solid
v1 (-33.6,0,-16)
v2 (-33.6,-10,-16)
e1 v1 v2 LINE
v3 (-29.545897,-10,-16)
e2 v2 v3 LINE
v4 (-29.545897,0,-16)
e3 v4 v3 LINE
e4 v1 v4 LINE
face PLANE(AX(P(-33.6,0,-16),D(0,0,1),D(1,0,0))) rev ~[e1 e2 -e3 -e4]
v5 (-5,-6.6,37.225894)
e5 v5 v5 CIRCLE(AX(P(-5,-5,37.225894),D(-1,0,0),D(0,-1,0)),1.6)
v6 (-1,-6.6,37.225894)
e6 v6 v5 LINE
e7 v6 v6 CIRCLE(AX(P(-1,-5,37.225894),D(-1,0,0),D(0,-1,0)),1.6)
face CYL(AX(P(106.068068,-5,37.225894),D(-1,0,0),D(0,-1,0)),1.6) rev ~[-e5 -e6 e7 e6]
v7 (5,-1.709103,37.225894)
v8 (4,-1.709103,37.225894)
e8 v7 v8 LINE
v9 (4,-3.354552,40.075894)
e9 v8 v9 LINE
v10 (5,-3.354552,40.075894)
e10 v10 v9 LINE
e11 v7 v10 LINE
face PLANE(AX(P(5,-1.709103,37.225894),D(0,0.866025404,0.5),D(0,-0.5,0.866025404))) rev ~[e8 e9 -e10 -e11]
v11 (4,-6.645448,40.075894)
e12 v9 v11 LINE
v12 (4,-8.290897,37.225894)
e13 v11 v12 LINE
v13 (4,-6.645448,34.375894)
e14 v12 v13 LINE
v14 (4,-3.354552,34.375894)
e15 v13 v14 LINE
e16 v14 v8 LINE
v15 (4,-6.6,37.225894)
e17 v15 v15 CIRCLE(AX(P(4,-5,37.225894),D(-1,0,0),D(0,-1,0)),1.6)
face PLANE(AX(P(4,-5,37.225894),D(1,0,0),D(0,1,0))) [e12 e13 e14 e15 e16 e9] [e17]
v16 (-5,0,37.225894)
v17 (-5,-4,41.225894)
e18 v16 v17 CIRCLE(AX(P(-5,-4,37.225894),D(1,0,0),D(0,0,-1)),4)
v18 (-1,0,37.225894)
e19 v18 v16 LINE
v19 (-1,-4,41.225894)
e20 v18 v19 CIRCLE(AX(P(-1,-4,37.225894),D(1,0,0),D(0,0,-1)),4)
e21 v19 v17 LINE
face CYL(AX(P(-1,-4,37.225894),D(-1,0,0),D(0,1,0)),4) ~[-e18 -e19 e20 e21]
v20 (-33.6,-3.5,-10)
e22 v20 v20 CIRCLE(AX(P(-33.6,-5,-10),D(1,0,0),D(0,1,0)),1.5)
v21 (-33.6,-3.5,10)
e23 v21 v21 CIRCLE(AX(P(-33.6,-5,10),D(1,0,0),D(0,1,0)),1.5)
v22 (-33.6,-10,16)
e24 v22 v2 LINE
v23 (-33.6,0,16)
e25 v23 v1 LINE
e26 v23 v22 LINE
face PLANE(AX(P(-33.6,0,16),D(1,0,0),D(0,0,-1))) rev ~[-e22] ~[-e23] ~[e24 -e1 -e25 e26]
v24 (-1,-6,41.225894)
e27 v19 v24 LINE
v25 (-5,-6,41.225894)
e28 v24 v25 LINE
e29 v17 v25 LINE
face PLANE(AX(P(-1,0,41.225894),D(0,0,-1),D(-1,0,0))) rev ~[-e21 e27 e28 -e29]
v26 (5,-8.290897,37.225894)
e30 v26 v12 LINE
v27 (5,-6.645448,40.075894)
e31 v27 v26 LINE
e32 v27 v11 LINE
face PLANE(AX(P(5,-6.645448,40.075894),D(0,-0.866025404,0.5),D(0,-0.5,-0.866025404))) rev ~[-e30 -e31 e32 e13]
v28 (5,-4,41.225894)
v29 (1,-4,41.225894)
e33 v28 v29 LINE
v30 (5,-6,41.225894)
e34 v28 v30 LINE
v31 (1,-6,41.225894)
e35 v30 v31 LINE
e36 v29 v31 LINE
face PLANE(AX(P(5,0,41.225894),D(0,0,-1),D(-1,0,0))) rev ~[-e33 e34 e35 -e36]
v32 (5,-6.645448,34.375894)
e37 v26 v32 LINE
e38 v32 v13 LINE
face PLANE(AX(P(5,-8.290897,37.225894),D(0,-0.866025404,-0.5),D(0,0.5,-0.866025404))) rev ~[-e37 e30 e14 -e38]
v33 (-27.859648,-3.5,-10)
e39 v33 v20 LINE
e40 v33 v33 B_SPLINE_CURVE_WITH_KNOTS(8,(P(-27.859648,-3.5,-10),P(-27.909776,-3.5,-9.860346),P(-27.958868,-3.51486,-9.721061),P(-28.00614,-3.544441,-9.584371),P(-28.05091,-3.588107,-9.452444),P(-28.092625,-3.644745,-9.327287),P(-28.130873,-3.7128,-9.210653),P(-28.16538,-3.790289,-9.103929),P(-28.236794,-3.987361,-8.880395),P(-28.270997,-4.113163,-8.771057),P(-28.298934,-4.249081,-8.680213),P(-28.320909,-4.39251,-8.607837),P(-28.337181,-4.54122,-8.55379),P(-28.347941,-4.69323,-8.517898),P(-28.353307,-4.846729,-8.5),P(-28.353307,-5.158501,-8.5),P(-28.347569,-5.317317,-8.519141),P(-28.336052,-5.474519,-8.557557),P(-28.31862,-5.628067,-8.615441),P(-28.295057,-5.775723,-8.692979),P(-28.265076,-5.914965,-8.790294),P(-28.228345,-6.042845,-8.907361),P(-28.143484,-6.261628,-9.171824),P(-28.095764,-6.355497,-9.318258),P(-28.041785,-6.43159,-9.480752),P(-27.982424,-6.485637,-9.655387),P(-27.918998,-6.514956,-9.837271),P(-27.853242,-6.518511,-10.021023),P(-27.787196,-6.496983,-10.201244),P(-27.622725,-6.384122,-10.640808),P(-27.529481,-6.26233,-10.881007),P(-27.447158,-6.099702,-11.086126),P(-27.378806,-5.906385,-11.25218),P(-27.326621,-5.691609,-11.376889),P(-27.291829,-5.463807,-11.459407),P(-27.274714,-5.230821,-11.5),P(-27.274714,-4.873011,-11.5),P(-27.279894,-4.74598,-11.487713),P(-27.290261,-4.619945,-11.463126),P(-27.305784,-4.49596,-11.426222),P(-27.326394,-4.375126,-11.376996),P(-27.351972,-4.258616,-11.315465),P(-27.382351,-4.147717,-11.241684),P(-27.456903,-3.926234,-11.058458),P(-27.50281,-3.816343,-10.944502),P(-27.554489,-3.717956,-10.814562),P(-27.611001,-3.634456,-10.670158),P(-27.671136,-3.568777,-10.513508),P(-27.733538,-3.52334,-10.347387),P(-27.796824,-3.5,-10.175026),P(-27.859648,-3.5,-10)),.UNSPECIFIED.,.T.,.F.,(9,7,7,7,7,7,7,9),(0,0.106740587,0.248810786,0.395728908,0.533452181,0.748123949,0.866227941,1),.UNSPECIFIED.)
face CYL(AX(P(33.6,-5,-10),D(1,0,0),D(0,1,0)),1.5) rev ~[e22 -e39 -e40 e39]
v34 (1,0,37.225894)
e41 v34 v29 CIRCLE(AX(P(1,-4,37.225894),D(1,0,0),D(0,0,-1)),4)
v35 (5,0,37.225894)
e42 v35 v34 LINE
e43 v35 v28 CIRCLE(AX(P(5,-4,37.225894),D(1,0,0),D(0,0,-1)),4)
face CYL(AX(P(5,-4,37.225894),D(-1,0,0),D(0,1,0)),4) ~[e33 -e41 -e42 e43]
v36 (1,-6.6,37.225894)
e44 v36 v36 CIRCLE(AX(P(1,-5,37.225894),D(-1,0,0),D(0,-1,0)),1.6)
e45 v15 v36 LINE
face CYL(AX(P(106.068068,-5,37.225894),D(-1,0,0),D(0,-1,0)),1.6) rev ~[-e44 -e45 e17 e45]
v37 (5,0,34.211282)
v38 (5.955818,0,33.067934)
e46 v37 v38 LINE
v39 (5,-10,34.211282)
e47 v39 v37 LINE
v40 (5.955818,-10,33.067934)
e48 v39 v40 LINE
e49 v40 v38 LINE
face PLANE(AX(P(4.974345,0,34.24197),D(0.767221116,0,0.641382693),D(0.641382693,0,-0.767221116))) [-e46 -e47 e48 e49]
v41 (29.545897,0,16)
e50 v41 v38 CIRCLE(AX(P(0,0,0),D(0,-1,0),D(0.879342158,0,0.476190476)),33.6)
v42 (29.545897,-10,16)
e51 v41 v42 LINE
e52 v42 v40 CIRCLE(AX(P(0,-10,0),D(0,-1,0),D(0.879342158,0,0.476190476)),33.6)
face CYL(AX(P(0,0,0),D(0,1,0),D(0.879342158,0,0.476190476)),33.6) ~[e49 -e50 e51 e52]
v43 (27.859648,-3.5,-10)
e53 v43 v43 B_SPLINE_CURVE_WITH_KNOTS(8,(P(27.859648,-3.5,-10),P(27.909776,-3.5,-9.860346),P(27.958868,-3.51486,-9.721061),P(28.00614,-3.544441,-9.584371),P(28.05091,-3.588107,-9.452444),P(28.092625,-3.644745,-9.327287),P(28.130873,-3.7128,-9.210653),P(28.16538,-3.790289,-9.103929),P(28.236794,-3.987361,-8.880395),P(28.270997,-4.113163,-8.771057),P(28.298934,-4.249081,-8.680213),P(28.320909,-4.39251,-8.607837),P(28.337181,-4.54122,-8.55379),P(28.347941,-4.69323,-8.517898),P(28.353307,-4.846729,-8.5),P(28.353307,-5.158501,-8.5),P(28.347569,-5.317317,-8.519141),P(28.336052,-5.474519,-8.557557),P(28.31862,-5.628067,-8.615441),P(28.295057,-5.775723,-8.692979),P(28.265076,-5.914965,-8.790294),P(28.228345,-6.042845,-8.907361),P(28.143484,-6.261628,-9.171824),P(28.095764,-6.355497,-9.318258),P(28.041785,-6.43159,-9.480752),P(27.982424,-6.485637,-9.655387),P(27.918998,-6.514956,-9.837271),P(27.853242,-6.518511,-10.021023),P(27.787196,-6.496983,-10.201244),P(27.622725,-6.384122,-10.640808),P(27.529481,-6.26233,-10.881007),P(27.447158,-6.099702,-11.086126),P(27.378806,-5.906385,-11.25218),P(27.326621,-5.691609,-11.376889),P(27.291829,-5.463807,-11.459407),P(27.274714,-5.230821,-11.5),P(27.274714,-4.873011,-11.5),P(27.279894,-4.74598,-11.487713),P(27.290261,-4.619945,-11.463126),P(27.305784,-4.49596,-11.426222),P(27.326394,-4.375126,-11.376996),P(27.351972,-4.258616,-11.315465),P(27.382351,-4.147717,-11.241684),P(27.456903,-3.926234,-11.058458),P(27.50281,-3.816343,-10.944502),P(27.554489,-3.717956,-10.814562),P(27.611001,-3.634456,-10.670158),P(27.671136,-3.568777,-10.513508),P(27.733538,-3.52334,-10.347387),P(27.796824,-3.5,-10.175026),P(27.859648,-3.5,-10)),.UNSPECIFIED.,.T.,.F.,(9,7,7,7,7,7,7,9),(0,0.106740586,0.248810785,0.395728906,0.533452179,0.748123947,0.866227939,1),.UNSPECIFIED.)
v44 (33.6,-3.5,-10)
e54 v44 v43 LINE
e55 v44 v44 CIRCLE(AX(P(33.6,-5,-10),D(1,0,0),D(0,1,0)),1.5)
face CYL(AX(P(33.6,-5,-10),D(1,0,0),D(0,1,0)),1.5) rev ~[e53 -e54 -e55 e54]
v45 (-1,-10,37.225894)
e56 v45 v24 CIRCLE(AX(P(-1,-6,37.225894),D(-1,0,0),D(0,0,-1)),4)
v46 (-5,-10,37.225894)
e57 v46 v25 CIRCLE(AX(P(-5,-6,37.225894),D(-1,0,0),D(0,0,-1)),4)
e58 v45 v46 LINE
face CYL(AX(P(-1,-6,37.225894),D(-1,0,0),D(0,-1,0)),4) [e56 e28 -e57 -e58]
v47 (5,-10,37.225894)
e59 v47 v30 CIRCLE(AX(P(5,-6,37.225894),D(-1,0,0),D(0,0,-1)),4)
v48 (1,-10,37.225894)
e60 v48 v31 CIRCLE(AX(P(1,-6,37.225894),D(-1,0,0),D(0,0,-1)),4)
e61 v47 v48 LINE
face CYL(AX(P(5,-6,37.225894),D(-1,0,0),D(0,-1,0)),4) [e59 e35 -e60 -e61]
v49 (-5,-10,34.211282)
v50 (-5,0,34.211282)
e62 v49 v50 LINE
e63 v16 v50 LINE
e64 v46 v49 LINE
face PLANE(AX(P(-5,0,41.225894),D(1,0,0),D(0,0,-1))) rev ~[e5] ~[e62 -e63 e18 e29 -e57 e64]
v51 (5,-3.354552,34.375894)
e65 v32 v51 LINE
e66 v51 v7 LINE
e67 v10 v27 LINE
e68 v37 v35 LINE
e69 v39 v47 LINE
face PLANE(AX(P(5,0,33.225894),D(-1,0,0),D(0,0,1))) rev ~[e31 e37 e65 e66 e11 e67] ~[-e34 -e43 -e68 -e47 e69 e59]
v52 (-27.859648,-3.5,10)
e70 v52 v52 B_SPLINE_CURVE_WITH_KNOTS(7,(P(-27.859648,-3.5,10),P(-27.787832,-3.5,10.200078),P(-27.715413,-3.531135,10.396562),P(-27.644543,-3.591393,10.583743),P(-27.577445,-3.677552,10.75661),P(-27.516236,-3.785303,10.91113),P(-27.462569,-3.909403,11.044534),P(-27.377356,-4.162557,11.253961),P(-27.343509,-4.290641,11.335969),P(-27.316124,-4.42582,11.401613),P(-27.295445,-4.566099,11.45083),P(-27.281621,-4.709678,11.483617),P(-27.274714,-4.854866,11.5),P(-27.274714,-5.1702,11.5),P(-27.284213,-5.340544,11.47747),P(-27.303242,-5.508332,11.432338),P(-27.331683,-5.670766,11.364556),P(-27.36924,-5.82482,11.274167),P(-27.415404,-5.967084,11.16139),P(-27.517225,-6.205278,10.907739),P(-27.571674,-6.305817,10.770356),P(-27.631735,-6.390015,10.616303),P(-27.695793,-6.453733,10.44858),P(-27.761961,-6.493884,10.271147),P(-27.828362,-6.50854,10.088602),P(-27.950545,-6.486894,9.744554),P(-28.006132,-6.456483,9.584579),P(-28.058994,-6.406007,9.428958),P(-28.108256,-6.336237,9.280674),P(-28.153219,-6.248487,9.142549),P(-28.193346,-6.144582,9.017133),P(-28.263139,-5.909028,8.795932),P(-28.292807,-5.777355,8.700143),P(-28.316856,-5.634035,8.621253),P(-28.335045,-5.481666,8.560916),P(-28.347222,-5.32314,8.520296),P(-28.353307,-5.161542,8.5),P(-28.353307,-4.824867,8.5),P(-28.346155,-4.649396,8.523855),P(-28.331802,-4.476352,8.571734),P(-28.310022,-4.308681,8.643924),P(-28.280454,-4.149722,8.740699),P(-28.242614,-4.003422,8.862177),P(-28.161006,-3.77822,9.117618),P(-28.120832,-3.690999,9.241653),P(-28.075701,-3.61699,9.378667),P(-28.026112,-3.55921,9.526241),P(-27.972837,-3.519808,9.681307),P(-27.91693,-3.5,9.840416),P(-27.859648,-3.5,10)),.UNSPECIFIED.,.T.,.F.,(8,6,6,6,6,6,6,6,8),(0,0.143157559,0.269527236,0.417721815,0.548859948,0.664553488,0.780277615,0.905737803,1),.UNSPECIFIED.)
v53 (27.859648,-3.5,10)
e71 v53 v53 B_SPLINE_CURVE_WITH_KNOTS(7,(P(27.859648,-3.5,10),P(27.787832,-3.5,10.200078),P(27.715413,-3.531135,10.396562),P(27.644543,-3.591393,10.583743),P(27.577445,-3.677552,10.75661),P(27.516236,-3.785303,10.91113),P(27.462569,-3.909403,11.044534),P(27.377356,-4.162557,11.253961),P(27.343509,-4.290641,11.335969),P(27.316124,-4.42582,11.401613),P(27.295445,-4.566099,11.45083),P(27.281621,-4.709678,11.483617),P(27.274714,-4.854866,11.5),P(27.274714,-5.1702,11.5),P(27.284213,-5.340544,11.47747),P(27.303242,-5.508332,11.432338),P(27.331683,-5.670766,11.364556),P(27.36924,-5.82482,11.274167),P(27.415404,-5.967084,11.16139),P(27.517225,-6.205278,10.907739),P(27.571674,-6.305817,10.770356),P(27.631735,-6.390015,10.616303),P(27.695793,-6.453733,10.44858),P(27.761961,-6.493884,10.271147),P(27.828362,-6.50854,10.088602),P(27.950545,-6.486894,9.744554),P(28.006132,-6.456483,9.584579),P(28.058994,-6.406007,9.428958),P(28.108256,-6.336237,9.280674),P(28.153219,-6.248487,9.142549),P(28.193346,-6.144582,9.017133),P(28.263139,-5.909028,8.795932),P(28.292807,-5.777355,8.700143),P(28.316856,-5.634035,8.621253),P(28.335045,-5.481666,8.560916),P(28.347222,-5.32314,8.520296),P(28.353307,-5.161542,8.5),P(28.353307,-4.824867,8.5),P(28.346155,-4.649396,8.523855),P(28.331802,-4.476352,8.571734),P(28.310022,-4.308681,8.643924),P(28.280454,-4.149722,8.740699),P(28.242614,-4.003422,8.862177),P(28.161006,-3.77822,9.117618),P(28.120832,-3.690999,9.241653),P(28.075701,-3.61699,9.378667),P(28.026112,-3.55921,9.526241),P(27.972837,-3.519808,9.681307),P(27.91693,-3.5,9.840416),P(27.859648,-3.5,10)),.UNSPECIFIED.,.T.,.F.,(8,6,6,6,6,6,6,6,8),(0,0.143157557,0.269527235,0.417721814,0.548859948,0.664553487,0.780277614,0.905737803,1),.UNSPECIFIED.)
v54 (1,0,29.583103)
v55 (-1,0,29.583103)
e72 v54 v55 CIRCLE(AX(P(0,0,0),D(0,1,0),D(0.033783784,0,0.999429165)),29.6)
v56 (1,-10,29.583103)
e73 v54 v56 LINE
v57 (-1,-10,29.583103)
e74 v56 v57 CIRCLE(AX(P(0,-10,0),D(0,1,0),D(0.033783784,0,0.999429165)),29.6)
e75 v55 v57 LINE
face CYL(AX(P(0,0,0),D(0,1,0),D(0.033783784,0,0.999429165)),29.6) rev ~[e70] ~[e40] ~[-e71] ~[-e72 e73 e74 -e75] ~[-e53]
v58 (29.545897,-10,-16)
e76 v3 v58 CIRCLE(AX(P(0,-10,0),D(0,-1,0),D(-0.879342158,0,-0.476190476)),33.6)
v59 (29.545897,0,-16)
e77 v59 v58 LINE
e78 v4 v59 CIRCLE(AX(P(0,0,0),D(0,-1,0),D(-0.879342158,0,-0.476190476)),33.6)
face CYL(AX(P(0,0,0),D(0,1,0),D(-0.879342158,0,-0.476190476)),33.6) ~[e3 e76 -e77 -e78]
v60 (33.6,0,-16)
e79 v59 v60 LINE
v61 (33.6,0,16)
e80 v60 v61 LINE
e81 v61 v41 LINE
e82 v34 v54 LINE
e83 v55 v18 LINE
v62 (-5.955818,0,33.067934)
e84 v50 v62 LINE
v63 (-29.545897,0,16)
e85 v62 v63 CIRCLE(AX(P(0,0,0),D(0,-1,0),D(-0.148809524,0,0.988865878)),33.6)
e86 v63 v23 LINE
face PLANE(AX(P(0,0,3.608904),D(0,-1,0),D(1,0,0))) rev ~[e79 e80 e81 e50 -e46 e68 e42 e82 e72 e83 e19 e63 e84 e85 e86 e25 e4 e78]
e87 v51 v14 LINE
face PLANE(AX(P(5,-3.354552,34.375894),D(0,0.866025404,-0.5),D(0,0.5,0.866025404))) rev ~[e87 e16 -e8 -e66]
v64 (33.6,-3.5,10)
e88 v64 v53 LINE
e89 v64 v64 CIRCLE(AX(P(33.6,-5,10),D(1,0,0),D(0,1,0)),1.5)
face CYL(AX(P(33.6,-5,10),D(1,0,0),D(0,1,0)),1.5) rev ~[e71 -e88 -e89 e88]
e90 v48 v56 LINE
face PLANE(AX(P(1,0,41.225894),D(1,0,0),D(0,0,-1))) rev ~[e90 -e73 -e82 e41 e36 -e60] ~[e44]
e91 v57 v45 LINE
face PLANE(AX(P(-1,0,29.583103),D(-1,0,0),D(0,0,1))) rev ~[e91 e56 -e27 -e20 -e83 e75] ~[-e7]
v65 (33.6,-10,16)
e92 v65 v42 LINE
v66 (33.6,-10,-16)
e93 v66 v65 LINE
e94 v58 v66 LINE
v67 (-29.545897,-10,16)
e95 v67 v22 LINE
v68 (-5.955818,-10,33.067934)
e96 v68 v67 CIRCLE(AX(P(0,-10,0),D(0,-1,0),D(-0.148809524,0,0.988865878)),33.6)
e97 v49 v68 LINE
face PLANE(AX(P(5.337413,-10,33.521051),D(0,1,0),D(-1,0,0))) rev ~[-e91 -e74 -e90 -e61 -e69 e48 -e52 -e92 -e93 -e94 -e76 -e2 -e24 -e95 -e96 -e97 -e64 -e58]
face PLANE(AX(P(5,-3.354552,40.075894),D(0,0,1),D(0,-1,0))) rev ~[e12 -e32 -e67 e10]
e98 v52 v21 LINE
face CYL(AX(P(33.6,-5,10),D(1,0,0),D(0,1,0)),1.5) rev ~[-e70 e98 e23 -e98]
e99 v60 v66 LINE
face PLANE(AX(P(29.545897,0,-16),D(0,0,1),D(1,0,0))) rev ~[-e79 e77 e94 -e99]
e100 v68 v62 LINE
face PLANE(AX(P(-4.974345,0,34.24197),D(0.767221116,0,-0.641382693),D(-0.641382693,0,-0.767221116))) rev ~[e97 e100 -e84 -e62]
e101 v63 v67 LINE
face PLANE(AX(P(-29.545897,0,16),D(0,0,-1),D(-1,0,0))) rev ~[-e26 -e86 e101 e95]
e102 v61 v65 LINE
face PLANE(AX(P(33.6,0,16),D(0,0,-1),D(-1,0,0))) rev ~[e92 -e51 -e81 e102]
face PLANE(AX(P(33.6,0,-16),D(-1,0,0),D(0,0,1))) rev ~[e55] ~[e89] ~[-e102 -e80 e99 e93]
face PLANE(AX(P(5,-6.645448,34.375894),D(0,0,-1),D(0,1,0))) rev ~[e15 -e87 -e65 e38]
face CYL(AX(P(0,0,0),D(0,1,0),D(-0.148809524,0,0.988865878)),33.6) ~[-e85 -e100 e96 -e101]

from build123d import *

# Parameters (mm, degrees)
F1_DEPTH    = 10
F2_R        = 1.5
F3_DEPTH    = 67.201
F5_DEPTH    = 1
F6_D        = 3.2
F7_R        = 4
F8_T1_DEPTH = 10


# Not quite as in the source:
# - a fillet or chamfer that OpenCascade refuses, or shapes differently, is made with other operations: its cross-section is extruded or revolved along the edge and cut away or added


with BuildPart() as f1:
    # F0 (on Front) → F1 (new body)
    with BuildSketch(Plane.XZ):
        with BuildLine():
            ThreePointArc((1, 29.5831032855), (0, -29.6), (-1, 29.5831032855))
            Line((-1, 29.5831032855), (-1, 41.225893517))
            Line((-1, 41.225893517), (-5, 41.225893517))
            Line((-5, 41.225893517), (-5, 33.225893517))
            ThreePointArc((-5, 33.225893517), (-19.3012329429, 27.503134492), (-29.5458965002, 16))
            Line((-29.5458965002, 16), (-33.6, 16))
            Line((-33.6, 16), (-33.6, -16))
            Line((-33.6, -16), (-29.5458965002, -16))
            ThreePointArc((-29.5458965002, -16), (0, -33.6), (29.5458965002, -16))
            Line((29.5458965002, -16), (33.6, -16))
            Line((33.6, -16), (33.6, 16))
            Line((33.6, 16), (29.5458965002, 16))
            ThreePointArc((29.5458965002, 16), (19.3012329429, 27.503134492), (5, 33.225893517))
            Line((5, 33.225893517), (5, 41.225893517))
            Line((5, 41.225893517), (1, 41.225893517))
            Line((1, 41.225893517), (1, 29.5831032855))
        make_face()
    extrude(amount=F1_DEPTH)

    # F2 (on face) → F3 (cut, through all)
    with BuildSketch(Plane.YZ.offset(33.6)):
        with Locations((-5, 10)):
            Circle(F2_R)
        with Locations((-5, -10)):
            Circle(F2_R)
    extrude(amount=-F3_DEPTH, mode=Mode.SUBTRACT)

    # F4 (on face) → F5 (cut)
    with BuildSketch(Plane.YZ.offset(5)):
        Polygon((-1.7091034656, 37.225893517), (-3.3545517328, 40.075893517), (-6.6454482672, 40.075893517), (-8.2908965344, 37.225893517), (-6.6454482672, 34.375893517), (-3.3545517328, 34.375893517), align=None)
    extrude(amount=-F5_DEPTH, mode=Mode.SUBTRACT)

    # F6 (through all)
    with Locations(Plane.YZ.offset(5)):
        with Locations((-5, 37.225893517)):
            Hole(F6_D / 2)

    # F7
    f7_edges = [f1.edges().sort_by_distance(p)[0] for p in [
        (3, 0, 41.225894),
        (3, -10, 41.225894),
        (-3, -10, 41.225894),
        (-3, 0, 41.225894),
    ]]
    fillet(f7_edges, radius=F7_R)

    # F8: chamfer of 1 on 2 edges, made by hand

    # F8_s2 → F8_t1 (join)
    with BuildSketch(Plane.XZ):
        with BuildLine():
            Line((4.9743446923, 34.2419704201), (5.9814730887, 33.0372447854))
            Line((5.9814730887, 33.0372447854), (5.977927959, 33.0175614916))
            ThreePointArc((5.977927959, 33.0175614916), (5.4901701774, 33.1281516451), (4.9970238095, 33.2061161994))
            Line((4.9970238095, 33.2061161994), (4.98, 33.225893517))
            ThreePointArc((4.98, 33.225893517), (4.98, 33.7339319685), (4.9543446923, 34.2419704201))
            Line((4.9543446923, 34.2419704201), (4.9743446923, 34.2419704201))
        make_face()
        with BuildLine():
            Line((-4.9743446923, 34.2419704201), (-5.9814730887, 33.0372447854))
            Line((-5.9814730887, 33.0372447854), (-5.977927959, 33.0175614916))
            ThreePointArc((-5.977927959, 33.0175614916), (-5.4901701774, 33.1281516451), (-4.9970238095, 33.2061161994))
            Line((-4.9970238095, 33.2061161994), (-4.98, 33.225893517))
            ThreePointArc((-4.98, 33.225893517), (-4.98, 33.7339319685), (-4.9543446923, 34.2419704201))
            Line((-4.9543446923, 34.2419704201), (-4.9743446923, 34.2419704201))
        make_face()
    extrude(amount=F8_T1_DEPTH)


solid = f1.part
